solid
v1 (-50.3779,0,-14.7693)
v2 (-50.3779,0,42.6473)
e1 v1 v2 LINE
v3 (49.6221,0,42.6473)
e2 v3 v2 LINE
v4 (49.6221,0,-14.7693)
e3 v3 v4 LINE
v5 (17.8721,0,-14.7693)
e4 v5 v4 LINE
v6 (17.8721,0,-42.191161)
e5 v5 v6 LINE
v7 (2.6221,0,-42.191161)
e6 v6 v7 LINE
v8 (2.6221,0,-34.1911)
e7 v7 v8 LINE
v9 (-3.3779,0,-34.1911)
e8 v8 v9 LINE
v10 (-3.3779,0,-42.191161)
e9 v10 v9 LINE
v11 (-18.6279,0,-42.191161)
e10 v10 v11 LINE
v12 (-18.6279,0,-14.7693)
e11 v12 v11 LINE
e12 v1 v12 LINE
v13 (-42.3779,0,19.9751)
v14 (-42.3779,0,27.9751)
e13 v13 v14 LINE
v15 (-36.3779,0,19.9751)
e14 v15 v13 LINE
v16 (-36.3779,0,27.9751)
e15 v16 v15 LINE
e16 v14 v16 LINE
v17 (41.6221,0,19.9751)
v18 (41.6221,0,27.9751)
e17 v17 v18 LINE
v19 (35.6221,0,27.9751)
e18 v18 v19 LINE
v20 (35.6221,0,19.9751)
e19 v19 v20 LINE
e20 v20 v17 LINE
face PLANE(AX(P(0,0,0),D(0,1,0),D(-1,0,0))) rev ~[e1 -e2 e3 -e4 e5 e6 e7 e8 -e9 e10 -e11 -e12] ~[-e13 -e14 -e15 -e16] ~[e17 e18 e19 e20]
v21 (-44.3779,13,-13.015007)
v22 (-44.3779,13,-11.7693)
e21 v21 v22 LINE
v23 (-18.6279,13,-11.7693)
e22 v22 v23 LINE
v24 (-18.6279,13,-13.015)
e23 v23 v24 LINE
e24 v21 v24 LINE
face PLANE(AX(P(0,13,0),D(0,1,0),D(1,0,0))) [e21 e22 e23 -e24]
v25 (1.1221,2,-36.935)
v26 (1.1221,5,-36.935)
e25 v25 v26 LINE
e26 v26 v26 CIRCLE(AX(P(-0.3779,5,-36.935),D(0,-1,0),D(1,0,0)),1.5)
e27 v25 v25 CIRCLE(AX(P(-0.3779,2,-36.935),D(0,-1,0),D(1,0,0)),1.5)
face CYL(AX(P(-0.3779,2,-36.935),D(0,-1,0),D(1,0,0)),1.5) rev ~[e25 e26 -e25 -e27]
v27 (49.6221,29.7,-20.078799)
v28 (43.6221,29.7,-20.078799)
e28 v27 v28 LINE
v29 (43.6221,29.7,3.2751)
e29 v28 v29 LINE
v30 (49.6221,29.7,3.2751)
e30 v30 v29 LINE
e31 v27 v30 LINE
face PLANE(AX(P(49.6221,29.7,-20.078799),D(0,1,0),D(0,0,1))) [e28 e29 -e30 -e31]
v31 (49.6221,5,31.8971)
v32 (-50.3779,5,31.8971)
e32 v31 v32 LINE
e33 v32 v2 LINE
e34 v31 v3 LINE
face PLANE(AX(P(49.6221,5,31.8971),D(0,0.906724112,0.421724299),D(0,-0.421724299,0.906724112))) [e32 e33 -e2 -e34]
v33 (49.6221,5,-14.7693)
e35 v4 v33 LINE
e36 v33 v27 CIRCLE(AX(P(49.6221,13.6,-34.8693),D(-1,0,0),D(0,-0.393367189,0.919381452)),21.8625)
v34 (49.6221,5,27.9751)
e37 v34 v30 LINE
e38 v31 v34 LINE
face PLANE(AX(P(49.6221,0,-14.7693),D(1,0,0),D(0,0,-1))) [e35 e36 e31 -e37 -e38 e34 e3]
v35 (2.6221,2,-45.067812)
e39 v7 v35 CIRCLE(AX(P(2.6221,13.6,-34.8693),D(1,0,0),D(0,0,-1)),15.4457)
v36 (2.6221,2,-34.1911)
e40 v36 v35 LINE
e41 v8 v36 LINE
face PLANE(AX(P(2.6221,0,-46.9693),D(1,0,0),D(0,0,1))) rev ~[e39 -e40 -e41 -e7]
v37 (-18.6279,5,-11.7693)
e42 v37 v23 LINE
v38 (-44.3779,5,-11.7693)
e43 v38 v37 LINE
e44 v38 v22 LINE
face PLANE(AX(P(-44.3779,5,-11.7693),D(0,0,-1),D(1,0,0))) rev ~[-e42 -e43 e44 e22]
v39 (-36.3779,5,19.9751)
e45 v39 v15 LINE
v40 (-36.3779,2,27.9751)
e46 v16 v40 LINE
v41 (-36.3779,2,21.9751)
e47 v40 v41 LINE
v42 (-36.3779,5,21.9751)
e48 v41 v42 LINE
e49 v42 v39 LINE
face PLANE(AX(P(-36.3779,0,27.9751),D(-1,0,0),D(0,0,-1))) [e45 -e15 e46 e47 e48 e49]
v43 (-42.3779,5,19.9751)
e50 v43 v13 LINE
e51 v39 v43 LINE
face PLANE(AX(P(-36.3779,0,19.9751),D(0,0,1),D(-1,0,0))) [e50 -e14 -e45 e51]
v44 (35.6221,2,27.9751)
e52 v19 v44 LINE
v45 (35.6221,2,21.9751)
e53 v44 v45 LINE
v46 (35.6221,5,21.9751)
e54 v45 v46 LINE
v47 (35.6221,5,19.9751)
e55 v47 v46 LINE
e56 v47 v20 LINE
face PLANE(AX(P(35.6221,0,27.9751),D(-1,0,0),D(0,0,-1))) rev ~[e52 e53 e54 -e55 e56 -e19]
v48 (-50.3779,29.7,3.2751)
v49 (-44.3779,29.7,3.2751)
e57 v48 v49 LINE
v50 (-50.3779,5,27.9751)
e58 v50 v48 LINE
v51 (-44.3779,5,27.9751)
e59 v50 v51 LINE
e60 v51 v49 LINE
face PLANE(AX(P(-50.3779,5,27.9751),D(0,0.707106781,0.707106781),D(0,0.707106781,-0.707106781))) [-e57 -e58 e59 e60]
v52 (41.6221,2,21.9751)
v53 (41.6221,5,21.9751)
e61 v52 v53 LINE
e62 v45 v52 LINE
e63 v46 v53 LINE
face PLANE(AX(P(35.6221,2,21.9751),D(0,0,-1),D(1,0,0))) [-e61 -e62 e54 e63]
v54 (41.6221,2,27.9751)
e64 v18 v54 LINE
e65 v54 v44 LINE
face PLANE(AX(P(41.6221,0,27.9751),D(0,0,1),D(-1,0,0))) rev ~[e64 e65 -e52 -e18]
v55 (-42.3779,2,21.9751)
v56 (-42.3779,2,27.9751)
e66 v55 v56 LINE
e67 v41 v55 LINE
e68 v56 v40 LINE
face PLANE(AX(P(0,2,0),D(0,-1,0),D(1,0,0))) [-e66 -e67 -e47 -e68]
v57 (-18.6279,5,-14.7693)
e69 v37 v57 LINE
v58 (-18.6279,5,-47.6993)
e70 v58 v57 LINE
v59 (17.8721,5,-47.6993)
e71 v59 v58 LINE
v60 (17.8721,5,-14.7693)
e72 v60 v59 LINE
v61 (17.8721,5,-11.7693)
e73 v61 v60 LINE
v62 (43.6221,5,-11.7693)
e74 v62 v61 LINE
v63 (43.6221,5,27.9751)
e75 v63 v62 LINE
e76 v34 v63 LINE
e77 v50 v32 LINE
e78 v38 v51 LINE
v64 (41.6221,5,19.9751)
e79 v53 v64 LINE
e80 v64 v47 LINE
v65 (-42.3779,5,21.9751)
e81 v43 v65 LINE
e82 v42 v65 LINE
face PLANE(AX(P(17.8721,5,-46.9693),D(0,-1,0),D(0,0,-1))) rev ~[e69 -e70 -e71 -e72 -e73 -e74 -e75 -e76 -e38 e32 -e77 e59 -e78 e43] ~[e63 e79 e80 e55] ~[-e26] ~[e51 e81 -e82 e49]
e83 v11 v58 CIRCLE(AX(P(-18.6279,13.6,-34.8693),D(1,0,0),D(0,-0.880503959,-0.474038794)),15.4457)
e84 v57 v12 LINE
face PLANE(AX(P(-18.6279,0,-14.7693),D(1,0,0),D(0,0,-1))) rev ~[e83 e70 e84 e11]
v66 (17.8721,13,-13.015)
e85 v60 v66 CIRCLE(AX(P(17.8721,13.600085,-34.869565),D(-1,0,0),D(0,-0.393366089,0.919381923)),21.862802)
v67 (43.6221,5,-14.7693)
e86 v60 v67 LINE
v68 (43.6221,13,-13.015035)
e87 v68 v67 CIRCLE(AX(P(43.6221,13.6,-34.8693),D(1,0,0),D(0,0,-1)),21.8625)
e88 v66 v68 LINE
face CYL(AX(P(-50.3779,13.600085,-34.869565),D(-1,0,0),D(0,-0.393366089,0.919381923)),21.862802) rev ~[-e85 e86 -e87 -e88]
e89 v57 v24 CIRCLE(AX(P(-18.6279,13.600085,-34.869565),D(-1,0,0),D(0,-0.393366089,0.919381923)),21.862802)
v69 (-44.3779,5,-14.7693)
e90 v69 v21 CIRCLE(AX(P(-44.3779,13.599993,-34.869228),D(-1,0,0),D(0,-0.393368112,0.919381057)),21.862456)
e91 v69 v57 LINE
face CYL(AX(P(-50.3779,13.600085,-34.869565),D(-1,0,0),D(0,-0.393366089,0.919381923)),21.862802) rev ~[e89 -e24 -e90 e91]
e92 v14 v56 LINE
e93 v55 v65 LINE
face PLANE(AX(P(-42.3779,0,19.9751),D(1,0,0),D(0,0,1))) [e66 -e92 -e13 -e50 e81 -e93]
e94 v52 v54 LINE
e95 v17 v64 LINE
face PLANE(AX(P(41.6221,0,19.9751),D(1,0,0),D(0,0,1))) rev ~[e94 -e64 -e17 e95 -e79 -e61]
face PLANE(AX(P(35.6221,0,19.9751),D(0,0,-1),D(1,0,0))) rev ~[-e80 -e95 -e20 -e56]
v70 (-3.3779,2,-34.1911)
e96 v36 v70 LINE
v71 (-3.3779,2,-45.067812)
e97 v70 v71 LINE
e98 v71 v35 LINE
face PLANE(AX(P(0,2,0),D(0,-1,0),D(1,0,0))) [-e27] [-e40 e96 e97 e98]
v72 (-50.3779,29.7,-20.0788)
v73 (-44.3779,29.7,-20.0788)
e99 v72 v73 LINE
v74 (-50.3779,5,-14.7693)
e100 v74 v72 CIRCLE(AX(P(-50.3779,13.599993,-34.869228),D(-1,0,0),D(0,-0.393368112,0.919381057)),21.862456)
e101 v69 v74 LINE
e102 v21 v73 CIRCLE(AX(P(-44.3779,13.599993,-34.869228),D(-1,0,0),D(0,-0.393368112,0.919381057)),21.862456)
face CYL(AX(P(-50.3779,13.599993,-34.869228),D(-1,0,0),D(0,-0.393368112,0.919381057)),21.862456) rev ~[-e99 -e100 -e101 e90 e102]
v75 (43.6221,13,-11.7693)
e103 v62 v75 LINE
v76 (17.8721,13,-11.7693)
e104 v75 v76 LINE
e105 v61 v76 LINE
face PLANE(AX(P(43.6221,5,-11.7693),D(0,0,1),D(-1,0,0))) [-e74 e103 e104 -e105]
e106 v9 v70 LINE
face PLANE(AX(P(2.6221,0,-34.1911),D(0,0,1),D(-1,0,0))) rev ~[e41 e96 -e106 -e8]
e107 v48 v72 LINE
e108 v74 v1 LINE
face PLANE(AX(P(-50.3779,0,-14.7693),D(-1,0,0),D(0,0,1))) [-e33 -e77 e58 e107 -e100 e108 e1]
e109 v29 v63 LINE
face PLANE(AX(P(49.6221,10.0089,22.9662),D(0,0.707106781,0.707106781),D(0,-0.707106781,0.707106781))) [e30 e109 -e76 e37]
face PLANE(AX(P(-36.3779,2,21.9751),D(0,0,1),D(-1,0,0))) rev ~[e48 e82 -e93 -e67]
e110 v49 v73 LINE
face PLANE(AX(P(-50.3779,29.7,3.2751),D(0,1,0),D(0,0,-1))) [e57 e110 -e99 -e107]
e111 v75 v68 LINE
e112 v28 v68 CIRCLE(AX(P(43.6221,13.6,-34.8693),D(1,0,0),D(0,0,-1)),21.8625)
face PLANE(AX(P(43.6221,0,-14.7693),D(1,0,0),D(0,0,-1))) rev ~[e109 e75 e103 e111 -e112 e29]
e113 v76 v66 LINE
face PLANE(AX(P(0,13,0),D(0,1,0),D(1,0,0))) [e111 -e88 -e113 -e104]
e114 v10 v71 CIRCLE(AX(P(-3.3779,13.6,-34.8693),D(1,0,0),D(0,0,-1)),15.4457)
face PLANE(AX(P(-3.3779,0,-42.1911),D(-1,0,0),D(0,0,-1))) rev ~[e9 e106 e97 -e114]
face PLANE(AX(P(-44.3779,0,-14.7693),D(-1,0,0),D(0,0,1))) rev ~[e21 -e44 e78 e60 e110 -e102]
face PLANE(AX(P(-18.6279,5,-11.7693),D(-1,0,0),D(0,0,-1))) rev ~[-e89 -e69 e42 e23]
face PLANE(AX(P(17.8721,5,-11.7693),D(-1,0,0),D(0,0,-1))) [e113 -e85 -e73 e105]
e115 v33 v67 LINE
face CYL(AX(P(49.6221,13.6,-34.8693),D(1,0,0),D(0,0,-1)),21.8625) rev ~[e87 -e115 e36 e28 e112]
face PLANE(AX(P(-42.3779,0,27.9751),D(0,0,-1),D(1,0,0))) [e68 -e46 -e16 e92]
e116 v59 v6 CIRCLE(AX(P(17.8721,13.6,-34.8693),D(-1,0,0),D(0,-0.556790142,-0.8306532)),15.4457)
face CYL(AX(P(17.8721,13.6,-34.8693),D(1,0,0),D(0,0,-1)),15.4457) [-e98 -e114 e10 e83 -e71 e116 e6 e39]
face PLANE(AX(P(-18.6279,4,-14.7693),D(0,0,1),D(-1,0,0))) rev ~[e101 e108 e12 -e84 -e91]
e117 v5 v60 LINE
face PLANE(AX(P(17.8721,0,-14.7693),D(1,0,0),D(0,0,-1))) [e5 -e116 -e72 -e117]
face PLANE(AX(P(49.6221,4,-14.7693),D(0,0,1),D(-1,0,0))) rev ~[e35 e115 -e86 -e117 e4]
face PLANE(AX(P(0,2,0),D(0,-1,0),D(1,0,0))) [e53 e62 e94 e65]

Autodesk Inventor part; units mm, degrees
ref_plane "YZ Plane" through (0, 0, 0) normal (1, 0, 0) x (0, 1, 0)
ref_plane "XZ Plane" through (0, 0, 0) normal (0, 1, 0) x (-1, 0, 0)
ref_plane "XY Plane" through (0, 0, 0) normal (0, 0, 1) x (1, 0, 0)
sketch "Sketch1" plane through (0, 0, 0) normal (0, 1, 0) x (-1, 0, 0)
  line L0 (-49.6221, -50.9693) -> (50.3779, -50.9693)
  line L1 (50.3779, -50.9693) -> (50.3779, 49.0307)
  line L2 (50.3779, 49.0307) -> (-49.6221, 49.0307)
  line L3 (-49.6221, 49.0307) -> (-49.6221, -50.9693)
  line L4 (-17.8721, -0.5117) -> (18.6279, -0.5117)
  line L5 (18.6279, -0.5117) -> (18.6279, -50.9693)
  line L6 (18.6279, -50.9693) -> (-17.8721, -50.9693)
  line L7 (-17.8721, -50.9693) -> (-17.8721, -0.5117)
  line L8 (-49.6221, -18.7693) -> (50.3779, -18.7693)
  line L9 (50.3779, -18.7693) -> (50.3779, -50.9693)
  line L10 (50.3779, -50.9693) -> (-49.6221, -50.9693)
  line L11 (-49.6221, -50.9693) -> (-49.6221, -18.7693)
  line L12 (-49.6221, -18.7693) -> (50.3779, -18.7693)
  line L13 (50.3779, -18.7693) -> (50.3779, -14.7693)
  line L14 (50.3779, -14.7693) -> (-49.6221, -14.7693)
  line L15 (-49.6221, -14.7693) -> (-49.6221, -18.7693)
  line L16 (-49.6221, -34.8693) -> (50.3779, -34.8693)
  line L17 (-49.6221, -50.9693) -> (50.3779, -50.9693)
  line L18 (50.3779, -50.9693) -> (50.3779, -46.9693)
  line L19 (50.3779, -46.9693) -> (-49.6221, -46.9693)
  line L20 (-49.6221, -46.9693) -> (-49.6221, -50.9693)
  point P0 (0, 0)
  point P1 (0.3779, -50.9693)
  point P2 (0.3779, -50.9693)
  point P3 (0.3779, -50.9693)
  point P4 (-49.6221, -14.7693)
  point P5 (-17.8721, -14.7693)
  point P6 (-17.8721, -46.9693)
  point P7 (18.6279, -46.9693)
  point P8 (18.6279, -14.7693)
  dimension "d0" = 100
  dimension "d1" = 100
  dimension "d2" = 36.5
  dimension "d3" = 100
  dimension "d4" = 32.2
  dimension "d5" = 4
  dimension "d6" = 4
extrude "Extrusion1" add sketch "Sketch1" along normal blind 4 contours L7 L16 L5 L19 | L7 L8 L5 L16 | L7 L14 L5 L8 | L3 L2 L1 L14 L5 L4 L7 | L7 L4 L5 L14
sketch "Sketch2" plane through (17.8721, 0, -14.7693) normal (1, 0, 0) x (0, 0, -1)
  line L0 (0, 0) -> (32.2, 0) projected
  line L1 (32.2, 0) -> (32.2, 4) projected
  line L2 (0, 4) -> (32.2, 4) projected
  line L3 (0, 0) -> (0, 4) projected
  circle A0 centre (20.1, 13.6) radius 16.1 projected
  line L4 (32.2, 0) -> (32.2, 4) projected
  circle A1 centre (20.1, 13.6) radius 15.4457
  point P0 (-14.7693, 0)
  point P1 (27.4219, 0)
extrude "Extrusion2" cut sketch "Sketch2" against normal through all contours A0 L1 L0 | L0 A1 L1 A0
sketch "Sketch3" plane through (0, 0, 0) normal (0, -1, 0) x (1, 0, 0)
  line L0 (-18.6279, -46.9693) -> (-18.6279, -42.1911) projected
  line L1 (17.8721, -46.9693) -> (-18.6279, -46.9693) projected
  line L2 (17.8721, -42.1911) -> (17.8721, -46.9693) projected
  line L3 (-18.6279, -42.1911) -> (17.8721, -42.1911) projected
  line L4 (-18.6279, -42.1911) -> (17.8721, -42.1911) projected
  line L5 (17.8721, -14.7693) -> (17.8721, -42.1911) projected
  line L6 (49.6221, -14.7693) -> (17.8721, -14.7693) projected
  line L7 (49.6221, 49.0307) -> (49.6221, -14.7693) projected
  line L8 (-50.3779, 49.0307) -> (49.6221, 49.0307) projected
  line L9 (-50.3779, -14.7693) -> (-50.3779, 49.0307) projected
  line L10 (-18.6279, -14.7693) -> (-50.3779, -14.7693) projected
  line L11 (-18.6279, -42.1911) -> (-18.6279, -14.7693) projected
  line L12 (17.8721, -46.9693) -> (-18.6279, -46.9693) projected
  line L13 (-18.6279, -42.1911) -> (17.8721, -42.1911) projected
  line L14 (2.6221, -34.1911) -> (-3.3779, -34.1911)
  line L15 (-3.3779, -34.1911) -> (-3.3779, -42.1911)
  line L16 (-3.3779, -42.1911) -> (2.6221, -42.1911)
  line L17 (2.6221, -42.1911) -> (2.6221, -34.1911)
  line L18 (2.6221, -42.1911) -> (-3.3779, -42.1911)
  line L19 (-3.3779, -42.1911) -> (-3.3779, -53.2472)
  line L20 (-3.3779, -53.2472) -> (2.6221, -53.2472)
  line L21 (2.6221, -53.2472) -> (2.6221, -42.1911)
  point P0 (0, 0)
  point P1 (-0.3779, -46.9693)
  point P2 (-0.3779, -42.1911)
  point P3 (-0.3779, -42.1911)
  dimension "d11" = 6
  dimension "d12" = 8
extrude "Extrusion3" cut sketch "Sketch3" against normal blind 2 contours L19 L3 L21 L1 | L1 L21 L20 L19 | L15 L14 L17 L3
sketch "Sketch4" plane through (0, 4, 0) normal (0, 1, 0) x (1, 0, 0)
  line L0 (49.6221, -49.0307) -> (49.6221, 14.7693) projected
  line L1 (49.6221, 14.7693) -> (17.8721, 14.7693) projected
  line L2 (17.8721, 14.7693) -> (17.8721, 46.9693) projected
  line L3 (17.8721, 46.9693) -> (-18.6279, 46.9693) projected
  line L4 (-18.6279, 46.9693) -> (-18.6279, 14.7693) projected
  line L5 (-18.6279, 14.7693) -> (-50.3779, 14.7693) projected
  line L6 (-50.3779, 14.7693) -> (-50.3779, -49.0307) projected
  line L7 (-50.3779, -49.0307) -> (49.6221, -49.0307) projected
  point P0 (0, 0)
extrude "Extrusion4" add sketch "Sketch4" along normal blind 1
sketch "Sketch5" plane through (17.8721, 0, -14.7693) normal (1, 0, 0) x (0, 0, -1)
  arc A0 (27.4219, 0) -> (32.2, 4) centre (20.1, 13.6) ccw projected
  arc A1 (27.4219, 0) -> (32.2, 4) centre (20.1, 13.6) ccw projected
  circle A2 centre (20.1, 13.6) radius 15.4457
  arc A3 (27.4219, 0) -> (32.2, 4) centre (20.1, 13.6) ccw projected
  line L0 (32.2, 4) -> (32.2, 5) projected
  line L1 (0, 5) -> (32.2, 5) projected
  line L2 (0, 0) -> (0, 5) projected
  line L3 (0, 0) -> (27.4219, 0) projected
  line L4 (32.2, 5) -> (32.93, 5)
  point P0 (-14.7693, 0)
  point P1 (32.2, 4)
extrude "Extrusion5" add sketch "Sketch5" against normal up to surface (36.5 mm away) contours L0 L4 A2
sketch "Sketch6" plane through (0, 2, 0) normal (0, -1, 0) x (1, 0, 0)
  line L0 (2.6221, -45.0678) -> (-3.3779, -45.0678) projected
  line L1 (2.6221, -34.1911) -> (2.6221, -45.0678) projected
  line L2 (-3.3779, -34.1911) -> (2.6221, -34.1911) projected
  line L3 (-3.3779, -45.0678) -> (-3.3779, -34.1911) projected
  line L4 (-3.3779, -34.1911) -> (2.6221, -34.1911) projected
  line L5 (-0.3779, -34.1911) -> (-0.3779, -35.8821)
  line L6 (-0.3779, -34.1911) -> (-0.3779, -36.935)
  circle A0 centre (-0.3779, -36.935) radius 1.5
  point P0 (0, 0)
  dimension "d19" = 3
extrude "Extrusion6" cut sketch "Sketch6" against normal blind 10 contours A0
sketch "Sketch7" plane through (49.6221, 0, 49.0307) normal (1, 0, 0) x (0, 0, -1)
  circle A0 centre (83.9, 13.6) radius 16.1 projected
  line L0 (0, 0) -> (63.8, 0) projected
  line L1 (63.8, 0) -> (63.8, 5) projected
  line L2 (0, 5) -> (63.8, 5) projected
  line L3 (0, 0) -> (0, 5) projected
  arc A1 (91.2219, 0) -> (96.73, 5) centre (83.9, 13.6) ccw projected
  line L4 (63.8, 5) -> (96.73, 5) projected
  line L5 (63.8, 0) -> (63.8, 5) projected
  line L6 (63.8, 0) -> (91.2219, 0) projected
  line L7 (0, 0) -> (63.8, 0) projected
  line L8 (0, 0) -> (0, -14.6713)
  line L9 (83.9, -2.5) -> (-11.8385, -2.5)
  line L10 (91.2219, 0) -> (63.8, 0) projected
  line L11 (3.6899, -2.5) -> (17.1336, 5)
  line L12 (0, 5) -> (63.8, 5) projected
  line L13 (17.1336, 5) -> (28.2336, 16.1)
  line L14 (17.1336, 5) -> (32.8313, 5) construction
  line L15 (28.2336, 16.1) -> (29.6478, 14.6857)
  line L16 (29.6478, 14.6857) -> (19.962, 5)
  line L17 (83.9, 29.7) -> (9.0674, 29.7)
  line L18 (29.6478, 14.6857) -> (44.662, 29.7)
  line L19 (63.8, 5) -> (96.73, 5) projected
  circle A2 centre (83.9, 13.6) radius 21.8625
  line L20 (17.1336, 5) -> (1.0083, -2.5)
  point P0 (49.0307, 0)
  point P1 (6.3834, 0)
  dimension "d22" = 45
  dimension "d23" = 2
extrude "Extrusion7" cut sketch "Sketch7" against normal through all contours L20 L0 L3 L2
sketch "Sketch8" plane through (49.6221, 0, -14.7693) normal (1, 0, 0) x (0, 0, -1)
  line L0 (-46.6664, 5) -> (-57.4166, 0) projected
  line L1 (-57.4166, 0) -> (0, 0) projected
  line L2 (0, 0) -> (0, 5) projected
  line L3 (-46.6664, 5) -> (0, 5) projected
  line L4 (0, 5) -> (-46.6664, 5) projected
  line L5 (-45.5728, 5) -> (-39.1497, 11.4231)
  line L6 (-45.5728, 5) -> (-36.4892, 5) construction
  line L7 (-39.1497, 11.4231) -> (-37.7355, 10.0089)
  line L8 (-37.7355, 10.0089) -> (-42.7444, 5)
  line L9 (-42.7444, 5) -> (-5.7272, 42.0172)
  circle A0 centre (20.1, 13.6) radius 16.1 projected
  line L10 (20.1, 29.7) -> (-35.8827, 29.7)
  line L11 (32.93, 5) -> (0, 5) projected
  circle A1 centre (20.1, 13.6) radius 21.8625
  point P0 (-14.7693, 0)
  point P1 (5.3095, 29.7)
  point P2 (-18.0444, 29.7)
  dimension "d26" = 45
  dimension "d27" = 2
extrude "Extrusion8" add sketch "Sketch8" against normal blind 6 contours L8 L9 L10 A1 L3
sketch "Sketch9" plane through (-50.3779, 0, -14.7693) normal (-1, 0, 0) x (0, 0, 1)
  line L0 (57.4166, 0) -> (46.6664, 5) projected
  line L1 (0, 5) -> (46.6664, 5) projected
  line L2 (0, 0) -> (0, 5) projected
  line L3 (0, 0) -> (57.4166, 0) projected
  line L4 (18.0444, 29.7) -> (-5.3095, 29.7) projected
  arc A0 (0, 5) -> (-5.3095, 29.7) centre (-20.1, 13.6) ccw projected
  line L5 (42.7444, 5) -> (0, 5) projected
  line L6 (42.7444, 5) -> (18.0444, 29.7) projected
  point P0 (14.7693, 0)
extrude "Extrusion9" add sketch "Sketch9" against normal blind 6 contours L1 A0 L4 L6
sketch "Sketch10" plane through (0, 5, 0) normal (0, 1, 0) x (1, 0, 0)
  line L0 (-44.3779, -27.9751) -> (-50.3779, -27.9751) projected
  line L1 (-50.3779, -27.9751) -> (-50.3779, -31.8971) projected
  line L2 (-50.3779, -31.8971) -> (49.6221, -31.8971) projected
  line L3 (49.6221, -31.8971) -> (49.6221, -27.9751) projected
  line L4 (49.6221, -27.9751) -> (43.6221, -27.9751) projected
  line L5 (43.6221, -27.9751) -> (43.6221, 14.7693) projected
  line L6 (43.6221, 14.7693) -> (17.8721, 14.7693) projected
  line L7 (17.8721, 14.7693) -> (17.8721, 47.6993) projected
  line L8 (17.8721, 47.6993) -> (-18.6279, 47.6993) projected
  line L9 (-18.6279, 47.6993) -> (-18.6279, 14.7693) projected
  line L10 (-18.6279, 14.7693) -> (-44.3779, 14.7693) projected
  line L11 (-44.3779, 14.7693) -> (-44.3779, -27.9751) projected
  circle A0 centre (-0.3779, 36.935) radius 1.5 projected
  line L12 (43.6221, -27.9751) -> (43.6221, 14.7693) projected
  line L13 (17.8721, 14.7693) -> (43.6221, 14.7693)
  line L14 (43.6221, 14.7693) -> (43.6221, 11.7693)
  line L15 (43.6221, 11.7693) -> (17.8721, 11.7693)
  line L16 (17.8721, 11.7693) -> (17.8721, 14.7693)
  line L17 (-44.3779, 14.7693) -> (-44.3779, -27.9751) projected
  line L18 (-18.6279, 14.7693) -> (-44.3779, 14.7693)
  line L19 (-44.3779, 14.7693) -> (-44.3779, 11.7693)
  line L20 (-44.3779, 11.7693) -> (-18.6279, 11.7693)
  line L21 (-18.6279, 11.7693) -> (-18.6279, 14.7693)
  point P0 (0, 0)
  dimension "d32" = 3
  dimension "d33" = 3
extrude "Extrusion10" add sketch "Sketch10" along normal blind 8 contours L11 L10 L21 L20 | L15 L16 L6 L5
sketch "Sketch11" plane through (-50.3779, 0, -14.7693) normal (-1, 0, 0) x (0, 0, 1)
  arc A0 (0, 5) -> (1.7543, 13) centre (-20.1, 13.6) ccw projected
  line L0 (0, 13) -> (1.7543, 13) projected
  line L1 (0, 5) -> (0, 13) projected
  point P0 (14.7693, 0)
extrude "Extrusion11" cut sketch "Sketch11" against normal through all
sketch "Sketch12" plane through (0, 0, 0) normal (0, -1, 0) x (1, 0, 0)
  line L0 (49.6221, 42.6473) -> (-50.3779, 42.6473) projected
  line L1 (-50.3779, -14.7693) -> (-50.3779, 42.6473) projected
  line L2 (-18.6279, -14.7693) -> (-50.3779, -14.7693) projected
  line L3 (-18.6279, -42.1911) -> (-18.6279, -14.7693) projected
  line L4 (-18.6279, -42.1911) -> (-3.3779, -42.1911) projected
  line L5 (-3.3779, -42.1911) -> (-3.3779, -34.1911) projected
  line L6 (-3.3779, -34.1911) -> (2.6221, -34.1911) projected
  line L7 (2.6221, -34.1911) -> (2.6221, -42.1911) projected
  line L8 (2.6221, -42.1911) -> (17.8721, -42.1911) projected
  line L9 (17.8721, -14.7693) -> (17.8721, -42.1911) projected
  line L10 (49.6221, -14.7693) -> (17.8721, -14.7693) projected
  line L11 (49.6221, 42.6473) -> (49.6221, -14.7693) projected
  circle A0 centre (-0.3779, -36.935) radius 1.5 projected
  line L12 (17.8721, -14.7693) -> (17.8721, -47.6993) projected
  line L13 (17.8721, -47.6993) -> (-18.6279, -47.6993) projected
  line L14 (-18.6279, -47.6993) -> (-18.6279, -14.7693) projected
  line L15 (-18.6279, -14.7693) -> (-18.6279, -11.7693) projected
  line L16 (-18.6279, -11.7693) -> (-44.3779, -11.7693) projected
  line L17 (-44.3779, -11.7693) -> (-44.3779, 27.9751) projected
  line L18 (-44.3779, 27.9751) -> (-50.3779, 27.9751) projected
  line L19 (-50.3779, 27.9751) -> (-50.3779, 31.8971) projected
  line L20 (-50.3779, 31.8971) -> (49.6221, 31.8971) projected
  line L21 (49.6221, 31.8971) -> (49.6221, 27.9751) projected
  line L22 (49.6221, 27.9751) -> (43.6221, 27.9751) projected
  line L23 (43.6221, 27.9751) -> (43.6221, -11.7693) projected
  line L24 (43.6221, -11.7693) -> (17.8721, -11.7693) projected
  line L25 (17.8721, -11.7693) -> (17.8721, -14.7693) projected
  line L26 (-44.3779, -11.7693) -> (-44.3779, 27.9751) projected
  line L27 (-44.3779, 27.9751) -> (-42.3779, 27.9751)
  line L28 (-42.3779, 27.9751) -> (-36.3779, 27.9751)
  line L29 (-36.3779, 27.9751) -> (-36.3779, 19.9751)
  line L30 (-36.3779, 19.9751) -> (-42.3779, 19.9751)
  line L31 (-42.3779, 19.9751) -> (-42.3779, 27.9751)
  line L32 (43.6221, 27.9751) -> (43.6221, -11.7693) projected
  line L33 (43.6221, 27.9751) -> (41.6221, 27.9751)
  line L34 (41.6221, 27.9751) -> (35.6221, 27.9751)
  line L35 (35.6221, 27.9751) -> (35.6221, 19.9751)
  line L36 (35.6221, 19.9751) -> (41.6221, 19.9751)
  line L37 (41.6221, 19.9751) -> (41.6221, 27.9751)
  point P0 (0, 0)
  dimension "d38" = 2
  dimension "d39" = 6
  dimension "d40" = 8
  dimension "d41" = 2
  dimension "d42" = 6
extrude "Extrusion12" cut sketch "Sketch12" against normal blind 2 contours L28 L29 L30 L31 | L37 L36 L35 L34
sketch "Sketch13" plane through (0, 2, 0) normal (0, -1, 0) x (1, 0, 0)
  line L0 (35.6221, 19.9751) -> (35.6221, 27.9751) projected
  line L1 (41.6221, 19.9751) -> (35.6221, 19.9751) projected
  line L2 (41.6221, 27.9751) -> (41.6221, 19.9751) projected
  line L3 (35.6221, 27.9751) -> (41.6221, 27.9751) projected
  line L4 (-36.3779, 19.9751) -> (-42.3779, 19.9751) projected
  line L5 (-36.3779, 27.9751) -> (-36.3779, 19.9751) projected
  line L6 (-42.3779, 27.9751) -> (-36.3779, 27.9751) projected
  line L7 (-42.3779, 19.9751) -> (-42.3779, 27.9751) projected
  line L8 (-36.3779, 27.9751) -> (-36.3779, 19.9751) projected
  line L9 (-42.3779, 19.9751) -> (-36.3779, 19.9751)
  line L10 (-36.3779, 19.9751) -> (-36.3779, 21.9751)
  line L11 (-36.3779, 21.9751) -> (-42.3779, 21.9751)
  line L12 (-42.3779, 21.9751) -> (-42.3779, 19.9751)
  line L13 (41.6221, 27.9751) -> (41.6221, 19.9751) projected
  line L14 (35.6221, 19.9751) -> (35.6221, 27.9751) projected
  line L15 (41.6221, 19.9751) -> (35.6221, 19.9751)
  line L16 (35.6221, 19.9751) -> (35.6221, 21.9751)
  line L17 (35.6221, 21.9751) -> (41.6221, 21.9751)
  line L18 (41.6221, 21.9751) -> (41.6221, 19.9751)
  point P0 (0, 0)
  dimension "d45" = 2
extrude "Extrusion13" cut sketch "Sketch13" against normal through all contours L0 L17 L2 L1 | L4 L7 L11 L5
properties part number "dół"
